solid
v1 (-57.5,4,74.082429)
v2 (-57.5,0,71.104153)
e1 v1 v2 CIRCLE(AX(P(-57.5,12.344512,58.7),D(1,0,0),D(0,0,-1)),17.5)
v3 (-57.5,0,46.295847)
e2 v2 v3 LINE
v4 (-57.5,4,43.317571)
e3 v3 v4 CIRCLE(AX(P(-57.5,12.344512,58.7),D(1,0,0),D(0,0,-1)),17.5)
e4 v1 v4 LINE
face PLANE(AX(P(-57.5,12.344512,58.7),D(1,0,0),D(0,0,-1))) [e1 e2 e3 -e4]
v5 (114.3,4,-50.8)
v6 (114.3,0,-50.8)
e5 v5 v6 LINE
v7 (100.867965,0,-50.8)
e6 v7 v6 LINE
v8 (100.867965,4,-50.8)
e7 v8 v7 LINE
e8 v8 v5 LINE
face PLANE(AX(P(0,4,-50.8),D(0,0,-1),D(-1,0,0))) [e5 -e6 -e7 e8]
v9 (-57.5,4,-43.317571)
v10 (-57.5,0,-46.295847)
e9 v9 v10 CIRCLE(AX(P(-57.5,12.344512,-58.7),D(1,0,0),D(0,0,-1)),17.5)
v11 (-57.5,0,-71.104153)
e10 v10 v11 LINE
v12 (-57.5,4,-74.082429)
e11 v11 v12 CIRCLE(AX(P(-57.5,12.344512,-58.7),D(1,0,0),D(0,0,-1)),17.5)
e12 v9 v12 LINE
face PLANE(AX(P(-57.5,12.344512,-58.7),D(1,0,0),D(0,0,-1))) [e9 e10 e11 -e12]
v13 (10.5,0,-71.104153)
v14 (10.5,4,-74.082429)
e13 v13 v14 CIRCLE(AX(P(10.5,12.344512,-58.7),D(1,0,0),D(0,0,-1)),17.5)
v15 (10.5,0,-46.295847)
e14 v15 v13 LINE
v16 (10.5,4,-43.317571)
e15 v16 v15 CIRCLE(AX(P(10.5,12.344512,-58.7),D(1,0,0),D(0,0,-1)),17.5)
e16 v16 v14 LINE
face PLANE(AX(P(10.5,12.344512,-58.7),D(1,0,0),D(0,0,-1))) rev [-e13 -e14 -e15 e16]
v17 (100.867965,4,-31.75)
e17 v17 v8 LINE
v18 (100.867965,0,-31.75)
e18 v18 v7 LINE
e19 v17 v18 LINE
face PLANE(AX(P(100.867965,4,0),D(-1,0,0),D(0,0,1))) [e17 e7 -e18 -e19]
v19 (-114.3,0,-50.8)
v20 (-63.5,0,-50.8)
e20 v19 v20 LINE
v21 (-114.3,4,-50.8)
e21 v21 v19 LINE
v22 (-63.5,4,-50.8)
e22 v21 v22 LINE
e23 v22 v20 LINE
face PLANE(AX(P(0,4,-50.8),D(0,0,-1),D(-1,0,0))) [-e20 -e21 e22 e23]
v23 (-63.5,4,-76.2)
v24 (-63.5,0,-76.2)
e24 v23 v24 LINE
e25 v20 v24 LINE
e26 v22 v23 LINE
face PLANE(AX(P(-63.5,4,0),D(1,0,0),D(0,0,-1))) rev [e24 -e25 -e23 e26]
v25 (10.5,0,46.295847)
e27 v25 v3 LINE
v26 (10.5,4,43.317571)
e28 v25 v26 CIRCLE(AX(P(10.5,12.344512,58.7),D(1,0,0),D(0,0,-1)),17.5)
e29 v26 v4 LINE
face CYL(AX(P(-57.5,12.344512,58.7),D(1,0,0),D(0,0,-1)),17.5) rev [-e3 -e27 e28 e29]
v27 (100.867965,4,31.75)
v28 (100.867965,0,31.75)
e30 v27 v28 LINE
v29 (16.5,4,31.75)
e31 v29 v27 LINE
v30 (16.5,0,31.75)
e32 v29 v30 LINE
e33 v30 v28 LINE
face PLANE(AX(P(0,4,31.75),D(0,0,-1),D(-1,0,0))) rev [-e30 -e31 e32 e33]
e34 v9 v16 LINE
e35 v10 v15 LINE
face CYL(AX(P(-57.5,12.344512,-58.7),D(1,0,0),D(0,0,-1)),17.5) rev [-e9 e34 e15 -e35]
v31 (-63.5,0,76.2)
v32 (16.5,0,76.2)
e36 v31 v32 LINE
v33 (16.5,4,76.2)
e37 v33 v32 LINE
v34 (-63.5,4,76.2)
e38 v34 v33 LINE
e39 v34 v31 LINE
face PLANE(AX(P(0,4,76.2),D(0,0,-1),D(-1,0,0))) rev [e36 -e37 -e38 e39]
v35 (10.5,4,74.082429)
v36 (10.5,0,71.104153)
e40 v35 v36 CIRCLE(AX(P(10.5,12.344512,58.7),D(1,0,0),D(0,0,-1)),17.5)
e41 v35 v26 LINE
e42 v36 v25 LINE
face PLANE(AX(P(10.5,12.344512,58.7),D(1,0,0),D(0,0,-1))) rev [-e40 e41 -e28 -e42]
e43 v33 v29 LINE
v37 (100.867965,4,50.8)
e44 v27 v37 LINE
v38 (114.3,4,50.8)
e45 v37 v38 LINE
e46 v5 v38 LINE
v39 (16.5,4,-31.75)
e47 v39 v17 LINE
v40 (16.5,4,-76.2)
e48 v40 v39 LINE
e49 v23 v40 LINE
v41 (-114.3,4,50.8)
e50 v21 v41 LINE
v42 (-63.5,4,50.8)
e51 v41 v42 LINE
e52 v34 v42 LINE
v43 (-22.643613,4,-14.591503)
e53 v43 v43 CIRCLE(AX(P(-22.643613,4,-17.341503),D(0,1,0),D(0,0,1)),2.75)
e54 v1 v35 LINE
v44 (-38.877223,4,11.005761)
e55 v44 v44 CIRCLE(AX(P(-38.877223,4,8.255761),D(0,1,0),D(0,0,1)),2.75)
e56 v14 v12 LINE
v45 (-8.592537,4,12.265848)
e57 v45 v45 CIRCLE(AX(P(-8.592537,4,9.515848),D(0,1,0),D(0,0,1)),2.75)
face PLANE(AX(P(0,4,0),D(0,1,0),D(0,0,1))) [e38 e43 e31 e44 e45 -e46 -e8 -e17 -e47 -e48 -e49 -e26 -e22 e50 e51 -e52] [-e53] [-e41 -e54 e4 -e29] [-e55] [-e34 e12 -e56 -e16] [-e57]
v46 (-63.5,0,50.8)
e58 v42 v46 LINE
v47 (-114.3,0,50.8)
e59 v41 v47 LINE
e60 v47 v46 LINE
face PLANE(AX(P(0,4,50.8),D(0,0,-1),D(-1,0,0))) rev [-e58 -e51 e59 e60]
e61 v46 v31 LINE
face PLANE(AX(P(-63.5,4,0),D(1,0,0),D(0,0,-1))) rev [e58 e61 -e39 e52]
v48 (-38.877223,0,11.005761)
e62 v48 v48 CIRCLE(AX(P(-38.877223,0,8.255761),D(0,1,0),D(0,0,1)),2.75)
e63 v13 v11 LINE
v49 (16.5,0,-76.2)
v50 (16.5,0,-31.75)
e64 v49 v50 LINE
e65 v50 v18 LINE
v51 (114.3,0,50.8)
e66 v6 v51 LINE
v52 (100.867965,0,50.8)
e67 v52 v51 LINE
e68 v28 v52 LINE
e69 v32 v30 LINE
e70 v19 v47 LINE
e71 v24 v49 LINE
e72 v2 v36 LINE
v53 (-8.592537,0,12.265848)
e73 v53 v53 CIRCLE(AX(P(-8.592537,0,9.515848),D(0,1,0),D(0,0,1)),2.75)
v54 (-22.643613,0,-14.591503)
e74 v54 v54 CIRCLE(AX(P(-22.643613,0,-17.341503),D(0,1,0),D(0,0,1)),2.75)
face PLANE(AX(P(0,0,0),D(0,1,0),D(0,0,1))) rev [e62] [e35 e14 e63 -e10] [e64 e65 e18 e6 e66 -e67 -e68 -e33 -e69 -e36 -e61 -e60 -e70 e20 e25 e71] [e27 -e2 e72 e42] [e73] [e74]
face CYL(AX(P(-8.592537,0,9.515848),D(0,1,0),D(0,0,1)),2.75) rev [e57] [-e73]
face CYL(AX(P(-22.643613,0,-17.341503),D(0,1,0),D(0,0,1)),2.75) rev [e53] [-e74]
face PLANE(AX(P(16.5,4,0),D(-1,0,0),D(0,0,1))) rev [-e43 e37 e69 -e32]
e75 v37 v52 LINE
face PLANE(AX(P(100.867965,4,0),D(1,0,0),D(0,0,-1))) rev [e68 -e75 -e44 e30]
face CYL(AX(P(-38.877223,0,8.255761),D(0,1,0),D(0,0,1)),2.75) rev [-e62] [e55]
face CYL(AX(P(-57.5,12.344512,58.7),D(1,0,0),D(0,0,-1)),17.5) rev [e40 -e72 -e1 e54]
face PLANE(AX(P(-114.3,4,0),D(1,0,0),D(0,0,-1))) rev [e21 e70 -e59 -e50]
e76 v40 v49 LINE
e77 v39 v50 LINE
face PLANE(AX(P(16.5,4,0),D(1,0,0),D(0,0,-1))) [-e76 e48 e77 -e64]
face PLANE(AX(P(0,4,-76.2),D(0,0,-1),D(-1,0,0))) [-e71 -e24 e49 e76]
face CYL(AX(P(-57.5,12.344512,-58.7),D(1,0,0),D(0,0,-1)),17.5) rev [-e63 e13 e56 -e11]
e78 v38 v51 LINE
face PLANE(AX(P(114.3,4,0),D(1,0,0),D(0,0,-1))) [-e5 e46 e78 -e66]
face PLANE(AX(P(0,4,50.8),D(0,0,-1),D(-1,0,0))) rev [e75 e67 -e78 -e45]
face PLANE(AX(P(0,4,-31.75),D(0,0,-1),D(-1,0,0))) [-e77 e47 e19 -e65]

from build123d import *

# Parameters (mm, degrees)
BOSS_EXTRUDE1_DEPTH    = 4
SPLIT2_SURFACE_1_BACK  = 275.772
SPLIT2_SURFACE_1_DEPTH = 551.544
SPLIT2_SURFACE_2_BACK  = 275.772
SPLIT2_SURFACE_2_DEPTH = 551.544
BOSS_EXTRUDE4_START    = -76.2
BOSS_EXTRUDE4_DEPTH    = 152.4
SKETCH8_R              = 17.5
CUT_EXTRUDE4_DEPTH     = 68
SKETCH11_R             = 2.75
CUT_EXTRUDE6_DEPTH     = 138.734999183
SKETCH12_W             = 167.624585895
SKETCH12_H             = 26.062825832
CUT_EXTRUDE7_DEPTH     = 147.892749991


with BuildPart() as part:
    # Sketch1 → Boss-Extrude1 (new body)
    with BuildSketch(Plane(origin=(0, 0, 0), x_dir=(1, 0, 0), z_dir=(0, 1, 0))):
        Polygon((-114.3, 50.8), (-114.3, -50.8), (-63.5, -50.8), (-63.5, -76.2), (16.5, -76.2), (16.5, -31.75), (100.867964722, -31.75), (100.867964722, -50.8), (114.3, -50.8), (114.3, 50.8), (100.867964722, 50.8), (100.867964722, 31.75), (16.5, 31.75), (16.5, 76.2), (-63.5, 76.2), (-63.5, 50.8), align=None)
    extrude(amount=BOSS_EXTRUDE1_DEPTH)


with BuildPart() as body_2:
    # Split2: the piece behind the surface
    add(part.part)
    # Split2 surface: a surface, the sketch's curves swept straight by 551.544 mm
    with BuildLine(Plane.XY.offset(76.2).offset(-SPLIT2_SURFACE_1_BACK), mode=Mode.PRIVATE) as split2_surface_1_path:
        Line((16.5, 0), (-23.5, 0))
        Line((-23.5, 0), (-23.5, 2))
        Line((-23.5, 2), (-63.5, 2))
        Line((-63.5, 2), (-63.5, 4))
    split2_surface_1 = Shell.extrude(split2_surface_1_path.wire(), (0 * SPLIT2_SURFACE_1_DEPTH, 0 * SPLIT2_SURFACE_1_DEPTH, 1 * SPLIT2_SURFACE_1_DEPTH))
    split(bisect_by=split2_surface_1, keep=Keep.BOTTOM)


with BuildPart() as part_1:
    add(part.part)

    # Split2: split by a surface, the side it looks to stays
    # Split2 surface: a surface, the sketch's curves swept straight by 551.544 mm
    with BuildLine(Plane.XY.offset(76.2).offset(-SPLIT2_SURFACE_2_BACK), mode=Mode.PRIVATE) as split2_surface_2_path:
        Line((16.5, 0), (-23.5, 0))
        Line((-23.5, 0), (-23.5, 2))
        Line((-23.5, 2), (-63.5, 2))
        Line((-63.5, 2), (-63.5, 4))
    split2_surface_2 = Shell.extrude(split2_surface_2_path.wire(), (0 * SPLIT2_SURFACE_2_DEPTH, 0 * SPLIT2_SURFACE_2_DEPTH, 1 * SPLIT2_SURFACE_2_DEPTH))
    split(bisect_by=split2_surface_2, keep=Keep.TOP)

    add(body_2.part)  # Boss-Extrude4 merges body 2
    # Boss-Extrude4: read off the stored shape, not the designer's step
    # Boss-Extrude4 outline → Boss-Extrude4 (add)
    with BuildSketch(Plane.XY.offset(BOSS_EXTRUDE4_START)):
        Polygon((-57.5, 4), (-63.5, 4), (-63.5, 0), (16.5, 0), (16.5, 4), (10.5, 4), (10.5, 14), (-57.5, 14), align=None)
    extrude(amount=BOSS_EXTRUDE4_DEPTH)

    # Sketch8 → Cut-Extrude4 (cut)
    with BuildSketch(Plane(origin=(10.5, 0, 0), x_dir=(0, 0, -1), z_dir=(1, 0, 0))):
        with Locations((-58.7, 12.344512168)):
            Circle(SKETCH8_R)
        with Locations((58.7, 12.344512168)):
            Circle(SKETCH8_R)
    extrude(amount=-CUT_EXTRUDE4_DEPTH, mode=Mode.SUBTRACT)


with BuildPart() as cut_extrude4_piece_1:
    # of the separate pieces the step leaves, piece 1, a body of its own (cut_extrude4_pieces)
    add(part_1.part.solids().sort_by_distance((16.5, 0, -31.75))[0])

    # Sketch11 → Cut-Extrude6 (cut, through all)
    with BuildSketch(Plane(origin=(0, 4, 0), x_dir=(1, 0, 0), z_dir=(0, 1, 0))):
        with Locations(Location((-22.643612575, 17.341502836, 0), (0, 0, 270))):
            Circle(SKETCH11_R)
        with Locations(Location((-38.877222753, -8.255760701, 0), (0, 0, 270))):
            Circle(SKETCH11_R)
        with Locations(Location((-8.592537174, -9.515847743, 0), (0, 0, 270))):
            Circle(SKETCH11_R)
    extrude(amount=-CUT_EXTRUDE6_DEPTH, mode=Mode.SUBTRACT)


with BuildPart() as cut_extrude4_piece_2:
    # of the separate pieces the step leaves, piece 2, a body of its own (cut_extrude4_pieces)
    add(part_1.part.solids().sort_by_distance((10.5, 14, 76.2))[0])


with BuildPart() as cut_extrude4_piece_3:
    # of the separate pieces the step leaves, piece 3, a body of its own (cut_extrude4_pieces)
    add(part_1.part.solids().sort_by_distance((-57.5, 14, -76.2))[0])


with BuildPart() as cut_extrude7_tool:
    # Sketch12 → Cut-Extrude7 (new, through all)
    with BuildSketch(Plane(origin=(10.5, 0, 0), x_dir=(0, 0, -1), z_dir=(1, 0, 0))):
        with Locations((1.392837232, 17.031412916)):
            Rectangle(SKETCH12_W, SKETCH12_H)
    extrude(amount=-CUT_EXTRUDE7_DEPTH)


with BuildPart() as cut_extrude4_piece_1_1:
    add(cut_extrude4_piece_1.part)

    # Cut-Extrude7: cut by cut_extrude7_tool
    add(cut_extrude7_tool.part, mode=Mode.SUBTRACT)


with BuildPart() as cut_extrude4_piece_2_1:
    add(cut_extrude4_piece_2.part)

    # Cut-Extrude7: cut by cut_extrude7_tool
    add(cut_extrude7_tool.part, mode=Mode.SUBTRACT)


with BuildPart() as cut_extrude4_piece_3_1:
    add(cut_extrude4_piece_3.part)

    # Cut-Extrude7: cut by cut_extrude7_tool
    add(cut_extrude7_tool.part, mode=Mode.SUBTRACT)


solid = cut_extrude4_piece_1_1.part
